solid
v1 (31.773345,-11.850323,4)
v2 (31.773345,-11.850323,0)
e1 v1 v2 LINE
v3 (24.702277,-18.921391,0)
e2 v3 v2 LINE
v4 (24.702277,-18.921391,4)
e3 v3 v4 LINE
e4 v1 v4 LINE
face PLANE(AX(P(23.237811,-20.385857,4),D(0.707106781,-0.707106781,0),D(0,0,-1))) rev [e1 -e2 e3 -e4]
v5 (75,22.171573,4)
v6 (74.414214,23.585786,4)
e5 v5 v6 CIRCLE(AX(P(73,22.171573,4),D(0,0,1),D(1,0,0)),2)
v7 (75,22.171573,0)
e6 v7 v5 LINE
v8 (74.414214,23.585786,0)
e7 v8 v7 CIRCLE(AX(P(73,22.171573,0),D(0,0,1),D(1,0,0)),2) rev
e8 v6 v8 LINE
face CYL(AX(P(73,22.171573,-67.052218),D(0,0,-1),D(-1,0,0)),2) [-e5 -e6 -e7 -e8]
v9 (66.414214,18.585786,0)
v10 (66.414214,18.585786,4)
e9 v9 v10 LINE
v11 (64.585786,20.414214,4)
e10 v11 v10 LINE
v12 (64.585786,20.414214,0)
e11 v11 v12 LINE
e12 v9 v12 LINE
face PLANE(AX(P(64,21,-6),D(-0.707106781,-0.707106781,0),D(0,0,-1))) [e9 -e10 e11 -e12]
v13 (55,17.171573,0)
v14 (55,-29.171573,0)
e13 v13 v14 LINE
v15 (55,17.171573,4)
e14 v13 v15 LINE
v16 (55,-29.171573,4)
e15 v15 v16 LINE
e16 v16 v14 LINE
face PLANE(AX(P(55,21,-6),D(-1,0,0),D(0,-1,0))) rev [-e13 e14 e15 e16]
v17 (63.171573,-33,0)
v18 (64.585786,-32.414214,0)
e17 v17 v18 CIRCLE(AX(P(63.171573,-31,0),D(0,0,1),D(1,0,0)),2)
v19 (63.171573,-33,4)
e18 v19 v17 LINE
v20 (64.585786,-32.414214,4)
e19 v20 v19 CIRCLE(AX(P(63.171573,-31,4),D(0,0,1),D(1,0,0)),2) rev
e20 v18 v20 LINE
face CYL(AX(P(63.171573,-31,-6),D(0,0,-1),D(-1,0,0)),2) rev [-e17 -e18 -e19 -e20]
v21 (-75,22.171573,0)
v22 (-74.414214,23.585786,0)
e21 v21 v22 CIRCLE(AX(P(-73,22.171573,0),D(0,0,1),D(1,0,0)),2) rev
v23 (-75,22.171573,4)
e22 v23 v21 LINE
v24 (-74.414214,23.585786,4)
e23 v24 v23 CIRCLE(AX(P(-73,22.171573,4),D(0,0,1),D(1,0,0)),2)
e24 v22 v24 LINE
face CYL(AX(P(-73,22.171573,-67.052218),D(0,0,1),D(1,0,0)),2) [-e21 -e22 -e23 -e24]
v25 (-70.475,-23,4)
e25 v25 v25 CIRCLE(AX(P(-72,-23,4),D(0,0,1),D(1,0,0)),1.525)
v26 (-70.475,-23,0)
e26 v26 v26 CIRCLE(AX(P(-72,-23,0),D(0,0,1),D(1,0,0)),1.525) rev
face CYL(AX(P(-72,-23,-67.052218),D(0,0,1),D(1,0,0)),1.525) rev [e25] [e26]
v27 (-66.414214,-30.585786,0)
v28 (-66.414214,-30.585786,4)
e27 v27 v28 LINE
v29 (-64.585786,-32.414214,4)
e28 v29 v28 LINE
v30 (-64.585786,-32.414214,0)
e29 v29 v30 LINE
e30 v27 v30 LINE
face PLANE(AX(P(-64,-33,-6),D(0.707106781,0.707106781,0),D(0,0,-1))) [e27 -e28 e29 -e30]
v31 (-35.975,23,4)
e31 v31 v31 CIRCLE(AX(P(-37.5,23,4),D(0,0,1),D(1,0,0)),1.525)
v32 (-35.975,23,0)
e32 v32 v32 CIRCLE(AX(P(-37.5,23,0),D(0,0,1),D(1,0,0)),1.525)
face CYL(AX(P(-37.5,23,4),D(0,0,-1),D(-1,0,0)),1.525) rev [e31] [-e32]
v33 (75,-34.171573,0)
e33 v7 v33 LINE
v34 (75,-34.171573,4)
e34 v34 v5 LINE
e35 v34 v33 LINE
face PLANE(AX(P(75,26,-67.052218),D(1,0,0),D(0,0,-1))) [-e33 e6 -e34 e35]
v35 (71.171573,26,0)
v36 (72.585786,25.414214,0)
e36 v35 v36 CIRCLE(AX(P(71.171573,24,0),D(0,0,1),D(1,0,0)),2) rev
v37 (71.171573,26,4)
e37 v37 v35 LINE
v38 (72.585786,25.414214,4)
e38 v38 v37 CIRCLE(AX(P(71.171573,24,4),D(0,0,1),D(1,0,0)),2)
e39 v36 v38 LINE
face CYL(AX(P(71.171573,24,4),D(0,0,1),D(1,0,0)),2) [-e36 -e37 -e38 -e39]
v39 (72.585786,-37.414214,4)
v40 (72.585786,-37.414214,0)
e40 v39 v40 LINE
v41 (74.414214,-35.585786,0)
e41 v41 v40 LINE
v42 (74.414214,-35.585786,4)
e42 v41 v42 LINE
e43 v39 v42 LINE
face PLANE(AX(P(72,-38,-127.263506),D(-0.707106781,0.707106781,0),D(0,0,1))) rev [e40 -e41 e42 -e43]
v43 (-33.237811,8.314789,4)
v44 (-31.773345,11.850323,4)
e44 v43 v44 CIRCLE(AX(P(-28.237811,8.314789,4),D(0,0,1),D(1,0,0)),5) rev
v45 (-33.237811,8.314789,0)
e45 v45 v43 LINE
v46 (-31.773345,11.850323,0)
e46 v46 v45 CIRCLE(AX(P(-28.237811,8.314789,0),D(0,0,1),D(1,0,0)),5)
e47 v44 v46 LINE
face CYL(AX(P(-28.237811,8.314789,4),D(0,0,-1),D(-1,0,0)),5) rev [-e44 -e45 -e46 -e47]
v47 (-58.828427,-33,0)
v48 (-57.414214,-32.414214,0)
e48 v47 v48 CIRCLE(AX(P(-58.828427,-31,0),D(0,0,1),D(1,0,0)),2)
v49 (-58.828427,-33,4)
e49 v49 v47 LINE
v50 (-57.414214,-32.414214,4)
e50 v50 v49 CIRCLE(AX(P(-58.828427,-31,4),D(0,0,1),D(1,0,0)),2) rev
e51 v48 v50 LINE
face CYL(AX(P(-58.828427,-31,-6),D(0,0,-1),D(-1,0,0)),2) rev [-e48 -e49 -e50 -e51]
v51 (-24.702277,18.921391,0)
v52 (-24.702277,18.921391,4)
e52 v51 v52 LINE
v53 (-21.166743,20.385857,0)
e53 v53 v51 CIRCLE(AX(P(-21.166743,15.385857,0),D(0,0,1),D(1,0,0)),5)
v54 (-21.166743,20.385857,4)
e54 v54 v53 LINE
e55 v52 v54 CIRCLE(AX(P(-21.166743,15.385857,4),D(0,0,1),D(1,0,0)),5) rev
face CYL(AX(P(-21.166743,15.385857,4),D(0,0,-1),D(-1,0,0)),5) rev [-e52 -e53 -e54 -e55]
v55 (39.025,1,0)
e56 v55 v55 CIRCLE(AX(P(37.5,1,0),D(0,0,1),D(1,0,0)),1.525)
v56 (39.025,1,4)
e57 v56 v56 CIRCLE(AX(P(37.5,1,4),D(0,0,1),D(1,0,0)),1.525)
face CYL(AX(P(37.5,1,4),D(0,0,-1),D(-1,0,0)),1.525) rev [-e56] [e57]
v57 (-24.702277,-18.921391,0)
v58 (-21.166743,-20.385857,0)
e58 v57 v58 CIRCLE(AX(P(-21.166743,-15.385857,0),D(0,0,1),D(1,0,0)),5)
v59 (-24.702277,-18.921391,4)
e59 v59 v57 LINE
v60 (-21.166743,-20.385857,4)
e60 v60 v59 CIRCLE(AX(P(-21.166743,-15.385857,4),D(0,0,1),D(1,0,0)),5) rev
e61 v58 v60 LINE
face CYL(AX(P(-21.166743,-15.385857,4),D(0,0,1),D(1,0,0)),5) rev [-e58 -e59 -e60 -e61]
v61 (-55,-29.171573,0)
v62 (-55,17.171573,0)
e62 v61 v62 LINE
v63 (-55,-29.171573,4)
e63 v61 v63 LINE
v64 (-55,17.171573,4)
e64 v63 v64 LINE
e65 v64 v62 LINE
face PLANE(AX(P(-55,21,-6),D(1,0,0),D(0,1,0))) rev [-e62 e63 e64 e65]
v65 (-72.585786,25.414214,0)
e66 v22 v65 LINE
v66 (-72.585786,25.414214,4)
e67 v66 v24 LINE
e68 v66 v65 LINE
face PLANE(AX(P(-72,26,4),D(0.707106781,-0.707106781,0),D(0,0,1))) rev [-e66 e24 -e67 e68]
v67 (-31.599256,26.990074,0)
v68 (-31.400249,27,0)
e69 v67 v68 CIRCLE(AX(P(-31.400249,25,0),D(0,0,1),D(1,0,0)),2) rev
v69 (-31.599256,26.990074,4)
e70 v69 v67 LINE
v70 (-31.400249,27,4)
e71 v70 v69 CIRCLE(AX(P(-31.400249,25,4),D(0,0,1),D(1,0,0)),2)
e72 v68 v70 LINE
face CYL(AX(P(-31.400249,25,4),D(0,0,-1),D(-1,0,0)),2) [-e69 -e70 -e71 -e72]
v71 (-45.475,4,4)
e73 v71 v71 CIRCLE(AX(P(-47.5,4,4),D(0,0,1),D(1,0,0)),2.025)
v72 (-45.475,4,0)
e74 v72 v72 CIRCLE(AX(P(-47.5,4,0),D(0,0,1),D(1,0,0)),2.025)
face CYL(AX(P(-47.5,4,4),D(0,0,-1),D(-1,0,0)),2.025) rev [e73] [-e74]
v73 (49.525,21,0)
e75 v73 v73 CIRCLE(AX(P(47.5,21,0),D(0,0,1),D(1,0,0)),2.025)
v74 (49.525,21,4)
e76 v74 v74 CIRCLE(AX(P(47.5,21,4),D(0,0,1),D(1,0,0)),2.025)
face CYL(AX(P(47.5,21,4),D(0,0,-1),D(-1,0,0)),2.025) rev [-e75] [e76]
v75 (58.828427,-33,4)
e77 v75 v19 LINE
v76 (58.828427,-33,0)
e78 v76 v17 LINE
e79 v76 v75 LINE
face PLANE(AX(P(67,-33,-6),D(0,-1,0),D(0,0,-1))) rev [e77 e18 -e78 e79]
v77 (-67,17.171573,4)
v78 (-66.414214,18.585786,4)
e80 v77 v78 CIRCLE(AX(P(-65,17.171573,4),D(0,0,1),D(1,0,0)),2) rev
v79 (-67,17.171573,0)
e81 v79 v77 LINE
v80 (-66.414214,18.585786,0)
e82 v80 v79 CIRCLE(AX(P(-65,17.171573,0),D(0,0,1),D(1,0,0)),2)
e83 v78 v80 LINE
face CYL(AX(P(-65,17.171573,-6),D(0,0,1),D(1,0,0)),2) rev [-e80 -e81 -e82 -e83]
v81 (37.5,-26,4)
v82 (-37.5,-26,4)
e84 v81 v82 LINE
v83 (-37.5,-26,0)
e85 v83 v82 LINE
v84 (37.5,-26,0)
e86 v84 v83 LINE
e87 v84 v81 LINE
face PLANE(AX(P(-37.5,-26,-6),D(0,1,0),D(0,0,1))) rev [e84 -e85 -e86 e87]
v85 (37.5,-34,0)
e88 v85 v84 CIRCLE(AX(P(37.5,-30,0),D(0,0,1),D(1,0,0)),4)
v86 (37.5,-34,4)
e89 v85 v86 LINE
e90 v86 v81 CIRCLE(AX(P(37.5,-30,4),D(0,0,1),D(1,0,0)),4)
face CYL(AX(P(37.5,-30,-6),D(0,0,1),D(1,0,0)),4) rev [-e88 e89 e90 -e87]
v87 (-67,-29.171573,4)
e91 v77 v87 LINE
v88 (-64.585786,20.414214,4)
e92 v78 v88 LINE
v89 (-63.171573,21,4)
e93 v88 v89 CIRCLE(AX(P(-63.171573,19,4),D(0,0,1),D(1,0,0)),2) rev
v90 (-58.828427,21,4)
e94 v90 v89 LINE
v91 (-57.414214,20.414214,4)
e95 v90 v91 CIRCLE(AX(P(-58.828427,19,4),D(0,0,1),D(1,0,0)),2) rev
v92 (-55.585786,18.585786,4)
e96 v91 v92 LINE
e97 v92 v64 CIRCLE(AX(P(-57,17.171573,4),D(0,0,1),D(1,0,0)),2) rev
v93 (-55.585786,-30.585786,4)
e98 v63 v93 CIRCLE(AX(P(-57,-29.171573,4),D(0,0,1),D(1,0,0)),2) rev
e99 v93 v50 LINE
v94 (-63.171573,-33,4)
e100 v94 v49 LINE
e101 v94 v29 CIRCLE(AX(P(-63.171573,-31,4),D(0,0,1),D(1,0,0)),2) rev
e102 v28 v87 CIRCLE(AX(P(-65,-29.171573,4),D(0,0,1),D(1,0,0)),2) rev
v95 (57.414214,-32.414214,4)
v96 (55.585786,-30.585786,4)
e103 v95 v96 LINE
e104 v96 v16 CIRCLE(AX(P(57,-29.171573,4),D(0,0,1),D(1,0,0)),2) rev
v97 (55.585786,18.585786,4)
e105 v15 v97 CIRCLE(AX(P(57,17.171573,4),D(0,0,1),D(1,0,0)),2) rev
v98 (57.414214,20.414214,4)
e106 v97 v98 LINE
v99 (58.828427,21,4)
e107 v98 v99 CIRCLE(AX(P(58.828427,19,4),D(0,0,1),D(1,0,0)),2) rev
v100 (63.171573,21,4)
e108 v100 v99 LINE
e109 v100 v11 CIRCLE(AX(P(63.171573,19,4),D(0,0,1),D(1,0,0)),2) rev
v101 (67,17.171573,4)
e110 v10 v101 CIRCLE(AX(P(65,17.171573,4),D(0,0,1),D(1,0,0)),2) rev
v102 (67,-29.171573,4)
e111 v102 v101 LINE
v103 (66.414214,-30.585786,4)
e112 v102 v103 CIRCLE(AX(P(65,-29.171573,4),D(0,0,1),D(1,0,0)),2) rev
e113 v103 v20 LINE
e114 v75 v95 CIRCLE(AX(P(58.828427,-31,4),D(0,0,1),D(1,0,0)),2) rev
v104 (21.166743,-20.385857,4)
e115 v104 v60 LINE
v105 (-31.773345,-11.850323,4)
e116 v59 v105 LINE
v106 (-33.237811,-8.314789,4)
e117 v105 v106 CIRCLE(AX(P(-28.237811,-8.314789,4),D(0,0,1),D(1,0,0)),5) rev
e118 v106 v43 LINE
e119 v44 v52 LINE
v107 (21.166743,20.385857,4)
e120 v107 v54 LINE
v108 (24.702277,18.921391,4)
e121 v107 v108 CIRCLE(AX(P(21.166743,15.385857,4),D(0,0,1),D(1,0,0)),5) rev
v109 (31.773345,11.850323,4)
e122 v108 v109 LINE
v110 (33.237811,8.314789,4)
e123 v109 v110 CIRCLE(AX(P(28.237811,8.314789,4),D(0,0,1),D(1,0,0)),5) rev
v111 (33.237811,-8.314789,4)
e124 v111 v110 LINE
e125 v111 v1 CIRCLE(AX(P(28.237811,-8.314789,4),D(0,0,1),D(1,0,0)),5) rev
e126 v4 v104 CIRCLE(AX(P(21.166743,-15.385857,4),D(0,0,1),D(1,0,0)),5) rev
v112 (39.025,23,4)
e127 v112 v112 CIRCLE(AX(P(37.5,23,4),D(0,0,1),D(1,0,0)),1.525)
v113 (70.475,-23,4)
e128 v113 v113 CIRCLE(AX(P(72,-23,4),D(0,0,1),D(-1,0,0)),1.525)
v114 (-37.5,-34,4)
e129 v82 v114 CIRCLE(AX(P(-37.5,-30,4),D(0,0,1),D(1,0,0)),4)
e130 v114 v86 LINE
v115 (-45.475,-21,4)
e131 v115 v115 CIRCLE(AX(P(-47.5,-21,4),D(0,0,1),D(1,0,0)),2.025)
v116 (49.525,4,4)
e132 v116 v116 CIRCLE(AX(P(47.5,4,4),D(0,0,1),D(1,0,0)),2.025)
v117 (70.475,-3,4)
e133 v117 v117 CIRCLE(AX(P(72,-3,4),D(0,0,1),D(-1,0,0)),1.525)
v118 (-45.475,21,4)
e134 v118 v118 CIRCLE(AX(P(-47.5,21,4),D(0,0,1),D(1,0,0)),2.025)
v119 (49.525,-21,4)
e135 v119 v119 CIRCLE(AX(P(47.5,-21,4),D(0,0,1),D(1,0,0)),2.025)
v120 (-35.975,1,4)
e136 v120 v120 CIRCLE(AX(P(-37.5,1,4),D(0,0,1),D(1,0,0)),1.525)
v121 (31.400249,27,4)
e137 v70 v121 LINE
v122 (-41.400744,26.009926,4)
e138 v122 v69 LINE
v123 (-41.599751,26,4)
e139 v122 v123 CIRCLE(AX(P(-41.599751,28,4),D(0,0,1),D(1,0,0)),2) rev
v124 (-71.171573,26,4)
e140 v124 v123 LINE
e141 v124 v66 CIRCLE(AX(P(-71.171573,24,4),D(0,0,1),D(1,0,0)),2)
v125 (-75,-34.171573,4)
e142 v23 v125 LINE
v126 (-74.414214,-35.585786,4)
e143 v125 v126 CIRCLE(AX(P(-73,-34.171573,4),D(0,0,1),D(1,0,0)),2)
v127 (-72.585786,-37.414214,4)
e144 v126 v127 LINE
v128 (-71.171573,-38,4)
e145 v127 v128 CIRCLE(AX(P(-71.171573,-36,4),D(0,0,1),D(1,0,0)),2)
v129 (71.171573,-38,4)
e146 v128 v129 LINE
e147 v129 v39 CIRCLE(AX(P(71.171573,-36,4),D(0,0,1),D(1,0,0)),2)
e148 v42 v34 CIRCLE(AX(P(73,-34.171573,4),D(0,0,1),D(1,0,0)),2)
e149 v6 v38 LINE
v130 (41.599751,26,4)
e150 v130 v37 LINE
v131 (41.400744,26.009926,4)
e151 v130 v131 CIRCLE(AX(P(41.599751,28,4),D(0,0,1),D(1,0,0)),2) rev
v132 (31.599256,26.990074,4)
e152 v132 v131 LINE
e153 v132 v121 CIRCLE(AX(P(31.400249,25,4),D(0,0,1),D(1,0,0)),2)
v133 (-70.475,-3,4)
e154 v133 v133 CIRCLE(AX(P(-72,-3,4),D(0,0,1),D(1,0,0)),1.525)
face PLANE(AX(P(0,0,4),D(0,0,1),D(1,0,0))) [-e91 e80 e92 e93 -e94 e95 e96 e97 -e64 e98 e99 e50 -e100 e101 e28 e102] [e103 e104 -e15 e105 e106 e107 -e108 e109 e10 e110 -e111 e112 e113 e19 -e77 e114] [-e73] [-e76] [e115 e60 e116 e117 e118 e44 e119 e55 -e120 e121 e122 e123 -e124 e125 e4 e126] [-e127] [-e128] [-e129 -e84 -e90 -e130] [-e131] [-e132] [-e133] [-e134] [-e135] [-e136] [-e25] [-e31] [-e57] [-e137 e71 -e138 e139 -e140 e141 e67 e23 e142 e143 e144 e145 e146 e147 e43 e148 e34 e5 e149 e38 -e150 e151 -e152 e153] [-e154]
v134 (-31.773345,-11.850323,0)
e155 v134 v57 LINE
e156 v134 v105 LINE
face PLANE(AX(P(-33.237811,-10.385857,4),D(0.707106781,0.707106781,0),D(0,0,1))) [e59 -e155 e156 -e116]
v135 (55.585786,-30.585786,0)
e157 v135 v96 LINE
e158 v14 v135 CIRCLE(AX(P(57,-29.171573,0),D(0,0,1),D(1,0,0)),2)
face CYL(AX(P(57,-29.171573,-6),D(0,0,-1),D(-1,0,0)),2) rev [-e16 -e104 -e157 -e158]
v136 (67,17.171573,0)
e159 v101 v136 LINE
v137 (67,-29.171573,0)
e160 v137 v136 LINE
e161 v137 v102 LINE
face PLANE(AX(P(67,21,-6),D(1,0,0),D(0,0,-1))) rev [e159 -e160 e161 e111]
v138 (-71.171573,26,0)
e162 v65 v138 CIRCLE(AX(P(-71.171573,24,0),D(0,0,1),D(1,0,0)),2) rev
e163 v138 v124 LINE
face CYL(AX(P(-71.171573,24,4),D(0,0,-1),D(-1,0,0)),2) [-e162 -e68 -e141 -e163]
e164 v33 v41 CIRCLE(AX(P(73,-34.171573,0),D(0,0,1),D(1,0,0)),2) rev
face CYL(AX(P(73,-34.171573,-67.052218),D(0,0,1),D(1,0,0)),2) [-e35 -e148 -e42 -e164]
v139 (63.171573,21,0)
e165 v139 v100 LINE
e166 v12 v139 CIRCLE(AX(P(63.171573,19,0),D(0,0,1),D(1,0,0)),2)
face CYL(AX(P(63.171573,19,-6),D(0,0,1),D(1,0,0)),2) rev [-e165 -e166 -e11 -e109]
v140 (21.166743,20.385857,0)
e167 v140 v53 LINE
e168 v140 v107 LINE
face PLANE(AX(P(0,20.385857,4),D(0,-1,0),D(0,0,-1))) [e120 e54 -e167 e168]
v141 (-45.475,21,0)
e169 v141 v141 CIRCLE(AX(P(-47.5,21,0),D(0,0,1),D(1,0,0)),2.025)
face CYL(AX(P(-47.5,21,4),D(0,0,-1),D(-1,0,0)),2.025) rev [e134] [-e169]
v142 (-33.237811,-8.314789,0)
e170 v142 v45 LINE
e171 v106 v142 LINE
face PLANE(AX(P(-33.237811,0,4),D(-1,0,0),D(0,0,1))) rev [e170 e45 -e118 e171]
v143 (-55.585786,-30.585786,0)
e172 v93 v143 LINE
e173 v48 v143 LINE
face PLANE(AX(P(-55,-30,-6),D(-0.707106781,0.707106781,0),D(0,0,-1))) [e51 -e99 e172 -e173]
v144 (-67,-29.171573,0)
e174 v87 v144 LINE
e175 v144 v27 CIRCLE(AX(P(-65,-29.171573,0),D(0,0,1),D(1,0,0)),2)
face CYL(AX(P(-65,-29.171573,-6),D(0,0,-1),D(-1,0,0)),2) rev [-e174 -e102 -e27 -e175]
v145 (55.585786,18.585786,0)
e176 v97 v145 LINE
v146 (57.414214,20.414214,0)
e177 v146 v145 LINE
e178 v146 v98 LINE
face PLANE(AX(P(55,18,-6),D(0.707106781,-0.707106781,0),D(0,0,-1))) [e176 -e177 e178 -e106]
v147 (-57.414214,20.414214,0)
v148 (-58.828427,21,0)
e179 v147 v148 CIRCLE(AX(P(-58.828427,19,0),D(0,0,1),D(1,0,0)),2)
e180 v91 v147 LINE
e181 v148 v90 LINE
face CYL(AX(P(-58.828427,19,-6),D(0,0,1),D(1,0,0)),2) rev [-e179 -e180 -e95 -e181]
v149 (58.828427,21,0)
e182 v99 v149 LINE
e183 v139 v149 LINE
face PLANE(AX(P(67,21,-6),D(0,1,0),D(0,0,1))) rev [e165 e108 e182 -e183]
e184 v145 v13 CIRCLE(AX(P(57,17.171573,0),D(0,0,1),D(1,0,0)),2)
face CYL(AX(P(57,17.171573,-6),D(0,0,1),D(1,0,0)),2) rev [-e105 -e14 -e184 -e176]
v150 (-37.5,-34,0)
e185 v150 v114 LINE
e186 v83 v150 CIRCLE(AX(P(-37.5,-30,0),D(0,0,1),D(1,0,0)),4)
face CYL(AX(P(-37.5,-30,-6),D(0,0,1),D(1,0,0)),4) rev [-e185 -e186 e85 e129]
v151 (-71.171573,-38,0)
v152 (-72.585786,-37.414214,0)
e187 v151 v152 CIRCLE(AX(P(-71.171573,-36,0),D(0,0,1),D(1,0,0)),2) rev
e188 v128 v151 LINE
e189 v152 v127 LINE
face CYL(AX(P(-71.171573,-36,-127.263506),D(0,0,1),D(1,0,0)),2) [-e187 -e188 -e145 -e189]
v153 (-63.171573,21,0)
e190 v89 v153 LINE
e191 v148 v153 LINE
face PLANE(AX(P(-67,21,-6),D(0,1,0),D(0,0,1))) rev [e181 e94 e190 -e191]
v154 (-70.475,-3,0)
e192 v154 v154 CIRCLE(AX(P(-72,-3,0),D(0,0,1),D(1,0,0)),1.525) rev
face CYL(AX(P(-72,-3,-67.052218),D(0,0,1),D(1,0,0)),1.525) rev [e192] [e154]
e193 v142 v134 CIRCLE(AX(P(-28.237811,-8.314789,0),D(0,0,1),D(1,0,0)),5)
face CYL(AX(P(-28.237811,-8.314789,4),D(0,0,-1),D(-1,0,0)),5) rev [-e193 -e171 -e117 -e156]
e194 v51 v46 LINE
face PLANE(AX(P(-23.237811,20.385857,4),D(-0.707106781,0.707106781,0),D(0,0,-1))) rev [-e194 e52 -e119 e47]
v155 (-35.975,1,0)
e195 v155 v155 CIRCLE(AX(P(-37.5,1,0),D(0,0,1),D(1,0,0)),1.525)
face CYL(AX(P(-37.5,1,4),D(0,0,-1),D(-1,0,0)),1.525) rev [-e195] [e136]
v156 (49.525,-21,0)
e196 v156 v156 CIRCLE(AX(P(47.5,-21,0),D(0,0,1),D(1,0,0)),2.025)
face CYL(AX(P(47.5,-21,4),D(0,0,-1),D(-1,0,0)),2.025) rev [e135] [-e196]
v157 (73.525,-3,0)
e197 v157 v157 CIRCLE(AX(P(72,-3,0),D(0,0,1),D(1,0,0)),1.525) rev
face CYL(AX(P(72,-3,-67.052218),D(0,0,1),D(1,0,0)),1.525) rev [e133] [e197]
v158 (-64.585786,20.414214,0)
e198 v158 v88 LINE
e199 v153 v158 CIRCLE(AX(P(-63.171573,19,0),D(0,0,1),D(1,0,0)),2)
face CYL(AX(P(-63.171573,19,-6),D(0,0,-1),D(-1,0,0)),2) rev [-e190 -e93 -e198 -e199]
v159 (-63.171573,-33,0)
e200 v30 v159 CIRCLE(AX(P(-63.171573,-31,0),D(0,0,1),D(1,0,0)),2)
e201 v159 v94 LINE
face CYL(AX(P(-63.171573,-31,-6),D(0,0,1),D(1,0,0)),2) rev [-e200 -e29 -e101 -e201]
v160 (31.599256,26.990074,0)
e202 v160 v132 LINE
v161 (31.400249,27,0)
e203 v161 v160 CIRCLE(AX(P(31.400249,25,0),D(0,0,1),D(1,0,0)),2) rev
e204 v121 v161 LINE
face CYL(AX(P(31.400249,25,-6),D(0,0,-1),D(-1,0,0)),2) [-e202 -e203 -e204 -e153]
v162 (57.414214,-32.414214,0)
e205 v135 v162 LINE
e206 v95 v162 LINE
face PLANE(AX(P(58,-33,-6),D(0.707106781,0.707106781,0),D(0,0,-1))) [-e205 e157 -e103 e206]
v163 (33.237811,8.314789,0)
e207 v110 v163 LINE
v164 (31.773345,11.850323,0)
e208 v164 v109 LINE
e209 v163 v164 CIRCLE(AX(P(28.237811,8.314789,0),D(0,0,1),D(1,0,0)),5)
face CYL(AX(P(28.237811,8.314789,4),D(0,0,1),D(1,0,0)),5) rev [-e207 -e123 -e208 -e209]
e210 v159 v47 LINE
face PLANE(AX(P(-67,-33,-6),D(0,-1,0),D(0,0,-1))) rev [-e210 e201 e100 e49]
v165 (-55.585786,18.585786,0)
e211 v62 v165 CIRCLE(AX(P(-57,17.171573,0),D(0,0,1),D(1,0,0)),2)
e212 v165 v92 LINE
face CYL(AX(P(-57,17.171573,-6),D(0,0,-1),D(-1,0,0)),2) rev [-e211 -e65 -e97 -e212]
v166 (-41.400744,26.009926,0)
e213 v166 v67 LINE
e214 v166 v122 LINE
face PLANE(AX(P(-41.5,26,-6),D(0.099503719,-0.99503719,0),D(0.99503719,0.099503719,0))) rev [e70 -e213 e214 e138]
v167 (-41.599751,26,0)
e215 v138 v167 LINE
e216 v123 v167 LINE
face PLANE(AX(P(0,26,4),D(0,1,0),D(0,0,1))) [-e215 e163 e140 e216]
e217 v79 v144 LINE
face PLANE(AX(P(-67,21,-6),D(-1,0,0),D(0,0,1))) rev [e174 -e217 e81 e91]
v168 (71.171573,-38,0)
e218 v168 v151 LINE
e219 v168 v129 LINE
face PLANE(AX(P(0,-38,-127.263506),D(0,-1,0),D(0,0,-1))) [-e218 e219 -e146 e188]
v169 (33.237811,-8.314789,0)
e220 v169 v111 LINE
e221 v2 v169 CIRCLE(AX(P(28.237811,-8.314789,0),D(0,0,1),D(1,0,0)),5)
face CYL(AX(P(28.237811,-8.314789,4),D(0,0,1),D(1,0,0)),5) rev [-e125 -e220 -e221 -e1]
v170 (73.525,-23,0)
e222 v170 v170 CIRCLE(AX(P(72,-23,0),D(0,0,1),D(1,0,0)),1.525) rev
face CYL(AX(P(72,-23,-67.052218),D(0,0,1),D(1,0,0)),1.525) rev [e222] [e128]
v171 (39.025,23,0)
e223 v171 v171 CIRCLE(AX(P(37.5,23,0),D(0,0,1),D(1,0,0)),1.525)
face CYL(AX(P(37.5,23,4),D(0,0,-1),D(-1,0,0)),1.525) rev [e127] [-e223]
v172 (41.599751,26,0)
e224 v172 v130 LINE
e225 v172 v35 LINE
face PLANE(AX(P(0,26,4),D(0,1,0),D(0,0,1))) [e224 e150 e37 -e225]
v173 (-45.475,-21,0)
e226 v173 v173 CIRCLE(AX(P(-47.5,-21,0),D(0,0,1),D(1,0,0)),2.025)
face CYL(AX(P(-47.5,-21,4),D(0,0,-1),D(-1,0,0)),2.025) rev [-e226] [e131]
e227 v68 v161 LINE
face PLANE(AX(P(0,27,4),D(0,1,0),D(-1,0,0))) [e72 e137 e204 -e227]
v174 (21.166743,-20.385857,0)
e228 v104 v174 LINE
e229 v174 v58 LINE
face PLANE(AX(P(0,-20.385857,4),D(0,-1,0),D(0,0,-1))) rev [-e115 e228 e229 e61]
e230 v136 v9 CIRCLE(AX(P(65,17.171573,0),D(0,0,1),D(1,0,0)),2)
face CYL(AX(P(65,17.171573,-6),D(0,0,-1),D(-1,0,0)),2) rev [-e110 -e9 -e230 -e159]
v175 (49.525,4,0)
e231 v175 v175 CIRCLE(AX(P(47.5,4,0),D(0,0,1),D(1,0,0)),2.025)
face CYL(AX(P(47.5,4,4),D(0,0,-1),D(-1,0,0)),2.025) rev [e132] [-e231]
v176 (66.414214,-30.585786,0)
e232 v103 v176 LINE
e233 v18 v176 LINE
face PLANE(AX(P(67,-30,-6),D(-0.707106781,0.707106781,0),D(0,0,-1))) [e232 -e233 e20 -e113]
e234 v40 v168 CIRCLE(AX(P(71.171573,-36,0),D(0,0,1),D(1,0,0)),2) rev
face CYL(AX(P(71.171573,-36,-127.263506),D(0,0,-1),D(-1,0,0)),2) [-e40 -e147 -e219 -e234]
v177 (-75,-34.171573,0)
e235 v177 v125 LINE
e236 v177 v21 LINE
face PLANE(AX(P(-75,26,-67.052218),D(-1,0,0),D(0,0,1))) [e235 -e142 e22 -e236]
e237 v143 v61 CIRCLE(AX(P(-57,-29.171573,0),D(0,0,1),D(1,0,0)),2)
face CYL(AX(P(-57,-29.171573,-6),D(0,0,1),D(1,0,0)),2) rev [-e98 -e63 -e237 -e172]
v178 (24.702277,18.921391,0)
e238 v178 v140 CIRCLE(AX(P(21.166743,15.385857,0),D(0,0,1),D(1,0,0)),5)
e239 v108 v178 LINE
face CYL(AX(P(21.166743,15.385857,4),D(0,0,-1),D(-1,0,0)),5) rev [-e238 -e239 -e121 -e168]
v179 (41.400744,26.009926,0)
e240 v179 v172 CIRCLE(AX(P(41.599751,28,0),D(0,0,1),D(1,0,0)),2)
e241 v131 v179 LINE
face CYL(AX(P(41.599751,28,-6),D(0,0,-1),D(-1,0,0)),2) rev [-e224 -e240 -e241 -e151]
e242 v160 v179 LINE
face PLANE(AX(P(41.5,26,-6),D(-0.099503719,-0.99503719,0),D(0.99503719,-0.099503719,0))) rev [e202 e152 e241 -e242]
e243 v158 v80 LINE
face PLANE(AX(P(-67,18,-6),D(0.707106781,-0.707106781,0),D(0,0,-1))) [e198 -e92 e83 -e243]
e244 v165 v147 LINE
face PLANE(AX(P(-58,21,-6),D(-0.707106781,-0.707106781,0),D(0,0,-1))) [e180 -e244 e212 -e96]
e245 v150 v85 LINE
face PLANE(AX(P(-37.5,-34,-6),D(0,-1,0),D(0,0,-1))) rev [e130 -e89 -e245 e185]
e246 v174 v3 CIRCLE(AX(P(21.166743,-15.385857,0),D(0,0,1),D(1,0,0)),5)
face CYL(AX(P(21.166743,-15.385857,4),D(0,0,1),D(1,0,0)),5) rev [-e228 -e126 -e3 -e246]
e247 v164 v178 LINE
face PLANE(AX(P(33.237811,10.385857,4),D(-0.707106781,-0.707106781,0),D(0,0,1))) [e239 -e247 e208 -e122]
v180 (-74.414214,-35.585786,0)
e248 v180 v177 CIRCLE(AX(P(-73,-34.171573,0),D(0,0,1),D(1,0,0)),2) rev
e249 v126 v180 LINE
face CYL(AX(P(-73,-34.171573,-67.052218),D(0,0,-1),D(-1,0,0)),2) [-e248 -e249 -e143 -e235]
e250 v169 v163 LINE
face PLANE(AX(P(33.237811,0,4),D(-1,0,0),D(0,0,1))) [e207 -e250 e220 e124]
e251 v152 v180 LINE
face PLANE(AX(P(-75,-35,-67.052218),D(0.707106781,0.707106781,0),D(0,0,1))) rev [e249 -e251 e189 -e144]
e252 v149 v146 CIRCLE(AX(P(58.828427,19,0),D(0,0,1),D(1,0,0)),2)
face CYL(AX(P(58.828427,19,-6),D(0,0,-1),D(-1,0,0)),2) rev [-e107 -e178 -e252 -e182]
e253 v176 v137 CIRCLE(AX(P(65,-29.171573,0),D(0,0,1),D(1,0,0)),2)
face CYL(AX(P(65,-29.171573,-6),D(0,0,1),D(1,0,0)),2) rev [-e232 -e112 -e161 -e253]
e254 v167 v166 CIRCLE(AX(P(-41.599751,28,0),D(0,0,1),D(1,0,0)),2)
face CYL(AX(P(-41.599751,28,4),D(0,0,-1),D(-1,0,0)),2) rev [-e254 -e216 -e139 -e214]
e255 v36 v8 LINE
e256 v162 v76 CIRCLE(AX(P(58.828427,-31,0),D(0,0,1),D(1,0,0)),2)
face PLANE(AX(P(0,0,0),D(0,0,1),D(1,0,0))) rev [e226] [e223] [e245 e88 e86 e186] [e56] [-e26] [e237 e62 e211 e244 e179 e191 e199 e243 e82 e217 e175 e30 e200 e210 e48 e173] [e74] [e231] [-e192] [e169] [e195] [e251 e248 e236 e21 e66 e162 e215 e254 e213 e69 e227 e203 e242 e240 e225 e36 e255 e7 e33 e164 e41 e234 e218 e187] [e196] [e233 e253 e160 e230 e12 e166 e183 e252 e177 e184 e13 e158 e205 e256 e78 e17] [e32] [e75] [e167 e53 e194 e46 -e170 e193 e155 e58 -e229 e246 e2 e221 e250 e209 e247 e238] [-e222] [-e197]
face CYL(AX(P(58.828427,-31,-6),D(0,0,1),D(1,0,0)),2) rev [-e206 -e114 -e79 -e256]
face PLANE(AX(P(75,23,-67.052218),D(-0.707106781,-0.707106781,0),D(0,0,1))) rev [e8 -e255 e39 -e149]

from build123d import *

# Parameters (mm, degrees)
SKETCH_1_W          = 105
SKETCH_1_H          = 52
SKETCH_1_R          = 2.025
SKETCH_1_R_2        = 1.525
SKETCH_1_W_2        = 83
SKETCH_1_H_2        = 1
EXTRUDE_3_DEPTH     = 4
SKETCH_3_W          = 105
SKETCH_3_H          = 12
EXTRUDE_4_DEPTH     = 4
SKETCH_6_W          = 66.47562141
SKETCH_6_H          = 40.771714464
CUT_EXTRUDE_1_DEPTH = 4
CHAMFER_1_SIZE      = 10
FILLET_2_R          = 5
SKETCH_7_W          = 20
SKETCH_7_H          = 64
SKETCH_7_R          = 1.525
EXTRUDE_5_DEPTH     = 4
SKETCH_8_W          = 12
SKETCH_8_H          = 54
CUT_EXTRUDE_2_DEPTH = 10
CUT_EXTRUDE_3_DEPTH = 10
CHAMFER_2_SIZE      = 3
FILLET_3_R          = 2


with BuildPart() as part:
    # 草图1 → 凸台-拉伸3 (new body)
    # profile 1 of 2: a face of its own
    with BuildSketch(Plane.XY):
        Rectangle(SKETCH_1_W, SKETCH_1_H)
        with Locations((-47.5, 4)):
            Circle(SKETCH_1_R, mode=Mode.SUBTRACT)
        with Locations((-47.5, 21)):
            Circle(SKETCH_1_R, mode=Mode.SUBTRACT)
        with Locations((-47.5, -21)):
            Circle(SKETCH_1_R, mode=Mode.SUBTRACT)
        with Locations((47.5, 21)):
            Circle(SKETCH_1_R, mode=Mode.SUBTRACT)
        with Locations((47.5, 4)):
            Circle(SKETCH_1_R, mode=Mode.SUBTRACT)
        with Locations((47.5, -21)):
            Circle(SKETCH_1_R, mode=Mode.SUBTRACT)
        with Locations((-37.5, 23)):
            Circle(SKETCH_1_R_2, mode=Mode.SUBTRACT)
        with Locations((-37.5, 1)):
            Circle(SKETCH_1_R_2, mode=Mode.SUBTRACT)
        with Locations((37.5, 23)):
            Circle(SKETCH_1_R_2, mode=Mode.SUBTRACT)
        with Locations((37.5, 1)):
            Circle(SKETCH_1_R_2, mode=Mode.SUBTRACT)
    # profile 2 of 2: a face of its own
    with BuildSketch(Plane.XY):
        with Locations((0, 26.5)):
            Rectangle(SKETCH_1_W_2, SKETCH_1_H_2)
    extrude(amount=EXTRUDE_3_DEPTH)

    # 草图3 → 凸台-拉伸4 (add)
    with BuildSketch(Plane.XY.offset(4)):
        with Locations((0, -32)):
            Rectangle(SKETCH_3_W, SKETCH_3_H)
        Polygon((-52.5, -26), (-52.5, 26), (-55, 26), (-55, -38), (-52.5, -38), align=None)
        Polygon((52.5, -38), (55, -38), (55, 26), (52.5, 26), (52.5, -26), align=None)
    extrude(amount=-EXTRUDE_4_DEPTH)

    # 草图6 → 切除-拉伸1 (cut)
    with BuildSketch(Plane(origin=(0, 0, 0), x_dir=(-1, 0, 0), z_dir=(0, 0, -1))):
        Rectangle(SKETCH_6_W, SKETCH_6_H)
    extrude(amount=-CUT_EXTRUDE_1_DEPTH, mode=Mode.SUBTRACT)

    # 倒角1
    chamfer_1_edges = [part.edges().sort_by_distance(p)[0] for p in [
        (-33.237810705, -20.385857232, 2),
        (33.237810705, -20.385857232, 2),
        (33.237810705, 20.385857232, 2),
        (-33.237810705, 20.385857232, 2),
    ]]
    chamfer(chamfer_1_edges, length=CHAMFER_1_SIZE)

    # 圆角2
    fillet_2_edges = [part.edges().sort_by_distance(p)[0] for p in [
        (-33.237810705, 10.385857232, 2),
        (-33.237810705, -10.385857232, 2),
        (23.237810705, -20.385857232, 2),
        (-23.237810705, -20.385857232, 2),
        (23.237810705, 20.385857232, 2),
        (-23.237810705, 20.385857232, 2),
        (33.237810705, -10.385857232, 2),
        (33.237810705, 10.385857232, 2),
    ]]
    fillet(fillet_2_edges, radius=FILLET_2_R)

    # 草图7 → 凸台-拉伸5 (add)
    # profile 1 of 2: a face of its own
    with BuildSketch(Plane.XY.offset(4)):
        with Locations((-65, -6)):
            Rectangle(SKETCH_7_W, SKETCH_7_H)
        with Locations((-72, -3)):
            Circle(SKETCH_7_R, mode=Mode.SUBTRACT)
        with Locations((-72, -23)):
            Circle(SKETCH_7_R, mode=Mode.SUBTRACT)
    # profile 2 of 2: a face of its own
    with BuildSketch(Plane.XY.offset(4)):
        with Locations((65, -6)):
            Rectangle(SKETCH_7_W, SKETCH_7_H)
        with Locations((72, -23)):
            Circle(SKETCH_7_R, mode=Mode.SUBTRACT)
        with Locations((72, -3)):
            Circle(SKETCH_7_R, mode=Mode.SUBTRACT)
    extrude(amount=-EXTRUDE_5_DEPTH)

    # 草图8 → 切除-拉伸2 (cut)
    with BuildSketch(Plane.XY.offset(4)):
        with Locations((-61, -6)):
            Rectangle(SKETCH_8_W, SKETCH_8_H)
        with Locations((61, -6)):
            Rectangle(SKETCH_8_W, SKETCH_8_H)
    extrude(amount=-CUT_EXTRUDE_2_DEPTH, mode=Mode.SUBTRACT)

    # 草图9 → 切除-拉伸3 (cut)
    with BuildSketch(Plane.XY.offset(4)):
        Polygon((41.5, 26), (31.5, 27), (41.5, 27), align=None)
        Polygon((-41.5, 27), (-41.5, 26), (-31.5, 27), align=None)
        with BuildLine():
            Line((-37.5, -26), (37.5, -26))
            ThreePointArc((37.5, -26), (41.5, -30), (37.5, -34))
            Line((37.5, -34), (-37.5, -34))
            ThreePointArc((-37.5, -34), (-41.5, -30), (-37.5, -26))
        make_face()
    extrude(amount=-CUT_EXTRUDE_3_DEPTH, mode=Mode.SUBTRACT)

    # 倒角2
    chamfer_2_edges = [part.edges().sort_by_distance(p)[0] for p in [
        (-75, 26, 2),
        (-75, -38, 2),
        (75, -38, 2),
        (75, 26, 2),
        (-67, -33, 2),
        (-67, 21, 2),
        (-55, 21, 2),
        (-55, -33, 2),
        (67, 21, 2),
        (67, -33, 2),
        (55, -33, 2),
        (55, 21, 2),
    ]]
    chamfer(chamfer_2_edges, length=CHAMFER_2_SIZE)

    # 圆角3
    # the kernel refuses this fillet: 2 mm, written as the material it adds along each edge
    with BuildSketch(Plane(origin=(41.5, 26, 0), x_dir=(1, 0, 0), z_dir=(0, 0, 1)), Plane(origin=(-41.5, 26, 0), x_dir=(0.9950371902099869, 0.09950371902102007, 0), z_dir=(0, 0, 1))) as fillet_3_piece_1:
        with BuildLine():
            CenterArc((FILLET_3_R * 0.0498756211208, FILLET_3_R), FILLET_3_R, 264.289406863, 5.710593137)
            Line((-FILLET_3_R * 0.0496280979001, FILLET_3_R * 0.00496280979), (0, 0))
            Line((0, 0), (FILLET_3_R * 0.0498756211209, 0))
        make_face()
    extrude(amount=4)
    with BuildSketch(Plane(origin=(-58, -33, 4), x_dir=(-1, 0, 0), z_dir=(0, 0, -1)), Plane(origin=(-64, -33, 4), x_dir=(-0.7071067811865475, 0.7071067811865475, 0), z_dir=(0, 0, -1)), Plane(origin=(-67, -30, 4), x_dir=(0, 1, 0), z_dir=(0, 0, -1)), Plane(origin=(-55, -30, 4), x_dir=(-0.7071067811865454, -0.7071067811865497, 0), z_dir=(0, 0, -1)), Plane(origin=(55, 18, 4), x_dir=(0.7071067811865475, 0.7071067811865475, 0), z_dir=(0, 0, -1)), Plane(origin=(67, 18, 4), x_dir=(0, -1, 0), z_dir=(0, 0, -1)), Plane(origin=(64, 21, 4), x_dir=(0.7071067811865475, -0.7071067811865475, 0), z_dir=(0, 0, -1)), Plane(origin=(58, 21, 4), x_dir=(1, 0, 0), z_dir=(0, 0, -1))) as fillet_3_piece_2:
        with BuildLine():
            CenterArc((FILLET_3_R * 0.414213562373, FILLET_3_R), FILLET_3_R, 225, 45)
            Line((-FILLET_3_R * 0.292893218813, FILLET_3_R * 0.292893218813), (0, 0))
            Line((0, 0), (FILLET_3_R * 0.414213562373, 0))
        make_face()
    extrude(amount=4)
    with BuildSketch(Plane(origin=(-67, 18, 4), x_dir=(0, -1, 0), z_dir=(0, 0, -1)), Plane(origin=(-55, 18, 4), x_dir=(-0.7071067811865475, 0.7071067811865475, 0), z_dir=(0, 0, -1)), Plane(origin=(-58, 21, 4), x_dir=(-1, 0, 0), z_dir=(0, 0, -1)), Plane(origin=(-64, 21, 4), x_dir=(-0.7071067811865475, -0.7071067811865475, 0), z_dir=(0, 0, -1)), Plane(origin=(64, -33, 4), x_dir=(0.7071067811865475, 0.7071067811865475, 0), z_dir=(0, 0, -1)), Plane(origin=(58, -33, 4), x_dir=(1, 0, 0), z_dir=(0, 0, -1)), Plane(origin=(55, -30, 4), x_dir=(0.7071067811865475, -0.7071067811865475, 0), z_dir=(0, 0, -1)), Plane(origin=(67, -30, 4), x_dir=(0, 1, 0), z_dir=(0, 0, -1))) as fillet_3_piece_3:
        with BuildLine():
            CenterArc((FILLET_3_R * 0.414213562373, -FILLET_3_R), FILLET_3_R, 90, 45)
            Line((-FILLET_3_R * 0.292893218813, -FILLET_3_R * 0.292893218813), (0, 0))
            Line((0, 0), (FILLET_3_R * 0.414213562373, 0))
        make_face()
    extrude(amount=4)
    # the kernel refuses this fillet: 2 mm, written as the material it takes off along each edge
    with BuildSketch(Plane(origin=(-31.5, 27, 4.249378106), x_dir=(1, 0, 0), z_dir=(0, 0, -1)), Plane(origin=(31.5, 27, 4.249378106), x_dir=(0.9950371902099905, -0.0995037190209848, 0), z_dir=(0, 0, -1))) as fillet_3_2_piece_1:
        with BuildLine():
            CenterArc((FILLET_3_R * 0.0498756211209, FILLET_3_R), FILLET_3_R, 264.289406863, 5.710593137)
            Line((-FILLET_3_R * 0.0496280979001, FILLET_3_R * 0.00496280979001), (0, 0))
            Line((0, 0), (FILLET_3_R * 0.0498756211209, 0))
        make_face()
    extrude(amount=4.498756211, mode=Mode.SUBTRACT)
    with BuildSketch(Plane(origin=(-72, -38, 6.071067812), x_dir=(1, 0, 0), z_dir=(0, 0, -1)), Plane(origin=(72, -38, 6.071067812), x_dir=(0.7071067811865475, 0.7071067811865475, 0), z_dir=(0, 0, -1)), Plane(origin=(75, 23, 6.071067812), x_dir=(-0.7071067811865475, 0.7071067811865475, 0), z_dir=(0, 0, -1)), Plane(origin=(75, -35, 6.071067812), x_dir=(0, 1, 0), z_dir=(0, 0, -1)), Plane(origin=(72, 26, 6.071067812), x_dir=(-1, 0, 0), z_dir=(0, 0, -1)), Plane(origin=(-75, -35, 6.071067812), x_dir=(0.7071067811865475, -0.7071067811865475, 0), z_dir=(0, 0, -1))) as fillet_3_2_piece_2:
        with BuildLine():
            CenterArc((FILLET_3_R * 0.414213562373, -FILLET_3_R), FILLET_3_R, 90, 45)
            Line((-FILLET_3_R * 0.292893218813, -FILLET_3_R * 0.292893218813), (0, 0))
            Line((0, 0), (FILLET_3_R * 0.414213562373, 0))
        make_face()
    extrude(amount=8.142135624, mode=Mode.SUBTRACT)
    with BuildSketch(Plane(origin=(-72, 26, 6.071067812), x_dir=(1, 0, 0), z_dir=(0, 0, -1)), Plane(origin=(-75, 23, 6.071067812), x_dir=(0.7071067811865497, 0.7071067811865454, 0), z_dir=(0, 0, -1))) as fillet_3_2_piece_3:
        with BuildLine():
            CenterArc((FILLET_3_R * 0.414213562373, FILLET_3_R), FILLET_3_R, 225, 45)
            Line((-FILLET_3_R * 0.292893218813, FILLET_3_R * 0.292893218813), (0, 0))
            Line((0, 0), (FILLET_3_R * 0.414213562373, 0))
        make_face()
    extrude(amount=8.142135624, mode=Mode.SUBTRACT)


solid = part.part
